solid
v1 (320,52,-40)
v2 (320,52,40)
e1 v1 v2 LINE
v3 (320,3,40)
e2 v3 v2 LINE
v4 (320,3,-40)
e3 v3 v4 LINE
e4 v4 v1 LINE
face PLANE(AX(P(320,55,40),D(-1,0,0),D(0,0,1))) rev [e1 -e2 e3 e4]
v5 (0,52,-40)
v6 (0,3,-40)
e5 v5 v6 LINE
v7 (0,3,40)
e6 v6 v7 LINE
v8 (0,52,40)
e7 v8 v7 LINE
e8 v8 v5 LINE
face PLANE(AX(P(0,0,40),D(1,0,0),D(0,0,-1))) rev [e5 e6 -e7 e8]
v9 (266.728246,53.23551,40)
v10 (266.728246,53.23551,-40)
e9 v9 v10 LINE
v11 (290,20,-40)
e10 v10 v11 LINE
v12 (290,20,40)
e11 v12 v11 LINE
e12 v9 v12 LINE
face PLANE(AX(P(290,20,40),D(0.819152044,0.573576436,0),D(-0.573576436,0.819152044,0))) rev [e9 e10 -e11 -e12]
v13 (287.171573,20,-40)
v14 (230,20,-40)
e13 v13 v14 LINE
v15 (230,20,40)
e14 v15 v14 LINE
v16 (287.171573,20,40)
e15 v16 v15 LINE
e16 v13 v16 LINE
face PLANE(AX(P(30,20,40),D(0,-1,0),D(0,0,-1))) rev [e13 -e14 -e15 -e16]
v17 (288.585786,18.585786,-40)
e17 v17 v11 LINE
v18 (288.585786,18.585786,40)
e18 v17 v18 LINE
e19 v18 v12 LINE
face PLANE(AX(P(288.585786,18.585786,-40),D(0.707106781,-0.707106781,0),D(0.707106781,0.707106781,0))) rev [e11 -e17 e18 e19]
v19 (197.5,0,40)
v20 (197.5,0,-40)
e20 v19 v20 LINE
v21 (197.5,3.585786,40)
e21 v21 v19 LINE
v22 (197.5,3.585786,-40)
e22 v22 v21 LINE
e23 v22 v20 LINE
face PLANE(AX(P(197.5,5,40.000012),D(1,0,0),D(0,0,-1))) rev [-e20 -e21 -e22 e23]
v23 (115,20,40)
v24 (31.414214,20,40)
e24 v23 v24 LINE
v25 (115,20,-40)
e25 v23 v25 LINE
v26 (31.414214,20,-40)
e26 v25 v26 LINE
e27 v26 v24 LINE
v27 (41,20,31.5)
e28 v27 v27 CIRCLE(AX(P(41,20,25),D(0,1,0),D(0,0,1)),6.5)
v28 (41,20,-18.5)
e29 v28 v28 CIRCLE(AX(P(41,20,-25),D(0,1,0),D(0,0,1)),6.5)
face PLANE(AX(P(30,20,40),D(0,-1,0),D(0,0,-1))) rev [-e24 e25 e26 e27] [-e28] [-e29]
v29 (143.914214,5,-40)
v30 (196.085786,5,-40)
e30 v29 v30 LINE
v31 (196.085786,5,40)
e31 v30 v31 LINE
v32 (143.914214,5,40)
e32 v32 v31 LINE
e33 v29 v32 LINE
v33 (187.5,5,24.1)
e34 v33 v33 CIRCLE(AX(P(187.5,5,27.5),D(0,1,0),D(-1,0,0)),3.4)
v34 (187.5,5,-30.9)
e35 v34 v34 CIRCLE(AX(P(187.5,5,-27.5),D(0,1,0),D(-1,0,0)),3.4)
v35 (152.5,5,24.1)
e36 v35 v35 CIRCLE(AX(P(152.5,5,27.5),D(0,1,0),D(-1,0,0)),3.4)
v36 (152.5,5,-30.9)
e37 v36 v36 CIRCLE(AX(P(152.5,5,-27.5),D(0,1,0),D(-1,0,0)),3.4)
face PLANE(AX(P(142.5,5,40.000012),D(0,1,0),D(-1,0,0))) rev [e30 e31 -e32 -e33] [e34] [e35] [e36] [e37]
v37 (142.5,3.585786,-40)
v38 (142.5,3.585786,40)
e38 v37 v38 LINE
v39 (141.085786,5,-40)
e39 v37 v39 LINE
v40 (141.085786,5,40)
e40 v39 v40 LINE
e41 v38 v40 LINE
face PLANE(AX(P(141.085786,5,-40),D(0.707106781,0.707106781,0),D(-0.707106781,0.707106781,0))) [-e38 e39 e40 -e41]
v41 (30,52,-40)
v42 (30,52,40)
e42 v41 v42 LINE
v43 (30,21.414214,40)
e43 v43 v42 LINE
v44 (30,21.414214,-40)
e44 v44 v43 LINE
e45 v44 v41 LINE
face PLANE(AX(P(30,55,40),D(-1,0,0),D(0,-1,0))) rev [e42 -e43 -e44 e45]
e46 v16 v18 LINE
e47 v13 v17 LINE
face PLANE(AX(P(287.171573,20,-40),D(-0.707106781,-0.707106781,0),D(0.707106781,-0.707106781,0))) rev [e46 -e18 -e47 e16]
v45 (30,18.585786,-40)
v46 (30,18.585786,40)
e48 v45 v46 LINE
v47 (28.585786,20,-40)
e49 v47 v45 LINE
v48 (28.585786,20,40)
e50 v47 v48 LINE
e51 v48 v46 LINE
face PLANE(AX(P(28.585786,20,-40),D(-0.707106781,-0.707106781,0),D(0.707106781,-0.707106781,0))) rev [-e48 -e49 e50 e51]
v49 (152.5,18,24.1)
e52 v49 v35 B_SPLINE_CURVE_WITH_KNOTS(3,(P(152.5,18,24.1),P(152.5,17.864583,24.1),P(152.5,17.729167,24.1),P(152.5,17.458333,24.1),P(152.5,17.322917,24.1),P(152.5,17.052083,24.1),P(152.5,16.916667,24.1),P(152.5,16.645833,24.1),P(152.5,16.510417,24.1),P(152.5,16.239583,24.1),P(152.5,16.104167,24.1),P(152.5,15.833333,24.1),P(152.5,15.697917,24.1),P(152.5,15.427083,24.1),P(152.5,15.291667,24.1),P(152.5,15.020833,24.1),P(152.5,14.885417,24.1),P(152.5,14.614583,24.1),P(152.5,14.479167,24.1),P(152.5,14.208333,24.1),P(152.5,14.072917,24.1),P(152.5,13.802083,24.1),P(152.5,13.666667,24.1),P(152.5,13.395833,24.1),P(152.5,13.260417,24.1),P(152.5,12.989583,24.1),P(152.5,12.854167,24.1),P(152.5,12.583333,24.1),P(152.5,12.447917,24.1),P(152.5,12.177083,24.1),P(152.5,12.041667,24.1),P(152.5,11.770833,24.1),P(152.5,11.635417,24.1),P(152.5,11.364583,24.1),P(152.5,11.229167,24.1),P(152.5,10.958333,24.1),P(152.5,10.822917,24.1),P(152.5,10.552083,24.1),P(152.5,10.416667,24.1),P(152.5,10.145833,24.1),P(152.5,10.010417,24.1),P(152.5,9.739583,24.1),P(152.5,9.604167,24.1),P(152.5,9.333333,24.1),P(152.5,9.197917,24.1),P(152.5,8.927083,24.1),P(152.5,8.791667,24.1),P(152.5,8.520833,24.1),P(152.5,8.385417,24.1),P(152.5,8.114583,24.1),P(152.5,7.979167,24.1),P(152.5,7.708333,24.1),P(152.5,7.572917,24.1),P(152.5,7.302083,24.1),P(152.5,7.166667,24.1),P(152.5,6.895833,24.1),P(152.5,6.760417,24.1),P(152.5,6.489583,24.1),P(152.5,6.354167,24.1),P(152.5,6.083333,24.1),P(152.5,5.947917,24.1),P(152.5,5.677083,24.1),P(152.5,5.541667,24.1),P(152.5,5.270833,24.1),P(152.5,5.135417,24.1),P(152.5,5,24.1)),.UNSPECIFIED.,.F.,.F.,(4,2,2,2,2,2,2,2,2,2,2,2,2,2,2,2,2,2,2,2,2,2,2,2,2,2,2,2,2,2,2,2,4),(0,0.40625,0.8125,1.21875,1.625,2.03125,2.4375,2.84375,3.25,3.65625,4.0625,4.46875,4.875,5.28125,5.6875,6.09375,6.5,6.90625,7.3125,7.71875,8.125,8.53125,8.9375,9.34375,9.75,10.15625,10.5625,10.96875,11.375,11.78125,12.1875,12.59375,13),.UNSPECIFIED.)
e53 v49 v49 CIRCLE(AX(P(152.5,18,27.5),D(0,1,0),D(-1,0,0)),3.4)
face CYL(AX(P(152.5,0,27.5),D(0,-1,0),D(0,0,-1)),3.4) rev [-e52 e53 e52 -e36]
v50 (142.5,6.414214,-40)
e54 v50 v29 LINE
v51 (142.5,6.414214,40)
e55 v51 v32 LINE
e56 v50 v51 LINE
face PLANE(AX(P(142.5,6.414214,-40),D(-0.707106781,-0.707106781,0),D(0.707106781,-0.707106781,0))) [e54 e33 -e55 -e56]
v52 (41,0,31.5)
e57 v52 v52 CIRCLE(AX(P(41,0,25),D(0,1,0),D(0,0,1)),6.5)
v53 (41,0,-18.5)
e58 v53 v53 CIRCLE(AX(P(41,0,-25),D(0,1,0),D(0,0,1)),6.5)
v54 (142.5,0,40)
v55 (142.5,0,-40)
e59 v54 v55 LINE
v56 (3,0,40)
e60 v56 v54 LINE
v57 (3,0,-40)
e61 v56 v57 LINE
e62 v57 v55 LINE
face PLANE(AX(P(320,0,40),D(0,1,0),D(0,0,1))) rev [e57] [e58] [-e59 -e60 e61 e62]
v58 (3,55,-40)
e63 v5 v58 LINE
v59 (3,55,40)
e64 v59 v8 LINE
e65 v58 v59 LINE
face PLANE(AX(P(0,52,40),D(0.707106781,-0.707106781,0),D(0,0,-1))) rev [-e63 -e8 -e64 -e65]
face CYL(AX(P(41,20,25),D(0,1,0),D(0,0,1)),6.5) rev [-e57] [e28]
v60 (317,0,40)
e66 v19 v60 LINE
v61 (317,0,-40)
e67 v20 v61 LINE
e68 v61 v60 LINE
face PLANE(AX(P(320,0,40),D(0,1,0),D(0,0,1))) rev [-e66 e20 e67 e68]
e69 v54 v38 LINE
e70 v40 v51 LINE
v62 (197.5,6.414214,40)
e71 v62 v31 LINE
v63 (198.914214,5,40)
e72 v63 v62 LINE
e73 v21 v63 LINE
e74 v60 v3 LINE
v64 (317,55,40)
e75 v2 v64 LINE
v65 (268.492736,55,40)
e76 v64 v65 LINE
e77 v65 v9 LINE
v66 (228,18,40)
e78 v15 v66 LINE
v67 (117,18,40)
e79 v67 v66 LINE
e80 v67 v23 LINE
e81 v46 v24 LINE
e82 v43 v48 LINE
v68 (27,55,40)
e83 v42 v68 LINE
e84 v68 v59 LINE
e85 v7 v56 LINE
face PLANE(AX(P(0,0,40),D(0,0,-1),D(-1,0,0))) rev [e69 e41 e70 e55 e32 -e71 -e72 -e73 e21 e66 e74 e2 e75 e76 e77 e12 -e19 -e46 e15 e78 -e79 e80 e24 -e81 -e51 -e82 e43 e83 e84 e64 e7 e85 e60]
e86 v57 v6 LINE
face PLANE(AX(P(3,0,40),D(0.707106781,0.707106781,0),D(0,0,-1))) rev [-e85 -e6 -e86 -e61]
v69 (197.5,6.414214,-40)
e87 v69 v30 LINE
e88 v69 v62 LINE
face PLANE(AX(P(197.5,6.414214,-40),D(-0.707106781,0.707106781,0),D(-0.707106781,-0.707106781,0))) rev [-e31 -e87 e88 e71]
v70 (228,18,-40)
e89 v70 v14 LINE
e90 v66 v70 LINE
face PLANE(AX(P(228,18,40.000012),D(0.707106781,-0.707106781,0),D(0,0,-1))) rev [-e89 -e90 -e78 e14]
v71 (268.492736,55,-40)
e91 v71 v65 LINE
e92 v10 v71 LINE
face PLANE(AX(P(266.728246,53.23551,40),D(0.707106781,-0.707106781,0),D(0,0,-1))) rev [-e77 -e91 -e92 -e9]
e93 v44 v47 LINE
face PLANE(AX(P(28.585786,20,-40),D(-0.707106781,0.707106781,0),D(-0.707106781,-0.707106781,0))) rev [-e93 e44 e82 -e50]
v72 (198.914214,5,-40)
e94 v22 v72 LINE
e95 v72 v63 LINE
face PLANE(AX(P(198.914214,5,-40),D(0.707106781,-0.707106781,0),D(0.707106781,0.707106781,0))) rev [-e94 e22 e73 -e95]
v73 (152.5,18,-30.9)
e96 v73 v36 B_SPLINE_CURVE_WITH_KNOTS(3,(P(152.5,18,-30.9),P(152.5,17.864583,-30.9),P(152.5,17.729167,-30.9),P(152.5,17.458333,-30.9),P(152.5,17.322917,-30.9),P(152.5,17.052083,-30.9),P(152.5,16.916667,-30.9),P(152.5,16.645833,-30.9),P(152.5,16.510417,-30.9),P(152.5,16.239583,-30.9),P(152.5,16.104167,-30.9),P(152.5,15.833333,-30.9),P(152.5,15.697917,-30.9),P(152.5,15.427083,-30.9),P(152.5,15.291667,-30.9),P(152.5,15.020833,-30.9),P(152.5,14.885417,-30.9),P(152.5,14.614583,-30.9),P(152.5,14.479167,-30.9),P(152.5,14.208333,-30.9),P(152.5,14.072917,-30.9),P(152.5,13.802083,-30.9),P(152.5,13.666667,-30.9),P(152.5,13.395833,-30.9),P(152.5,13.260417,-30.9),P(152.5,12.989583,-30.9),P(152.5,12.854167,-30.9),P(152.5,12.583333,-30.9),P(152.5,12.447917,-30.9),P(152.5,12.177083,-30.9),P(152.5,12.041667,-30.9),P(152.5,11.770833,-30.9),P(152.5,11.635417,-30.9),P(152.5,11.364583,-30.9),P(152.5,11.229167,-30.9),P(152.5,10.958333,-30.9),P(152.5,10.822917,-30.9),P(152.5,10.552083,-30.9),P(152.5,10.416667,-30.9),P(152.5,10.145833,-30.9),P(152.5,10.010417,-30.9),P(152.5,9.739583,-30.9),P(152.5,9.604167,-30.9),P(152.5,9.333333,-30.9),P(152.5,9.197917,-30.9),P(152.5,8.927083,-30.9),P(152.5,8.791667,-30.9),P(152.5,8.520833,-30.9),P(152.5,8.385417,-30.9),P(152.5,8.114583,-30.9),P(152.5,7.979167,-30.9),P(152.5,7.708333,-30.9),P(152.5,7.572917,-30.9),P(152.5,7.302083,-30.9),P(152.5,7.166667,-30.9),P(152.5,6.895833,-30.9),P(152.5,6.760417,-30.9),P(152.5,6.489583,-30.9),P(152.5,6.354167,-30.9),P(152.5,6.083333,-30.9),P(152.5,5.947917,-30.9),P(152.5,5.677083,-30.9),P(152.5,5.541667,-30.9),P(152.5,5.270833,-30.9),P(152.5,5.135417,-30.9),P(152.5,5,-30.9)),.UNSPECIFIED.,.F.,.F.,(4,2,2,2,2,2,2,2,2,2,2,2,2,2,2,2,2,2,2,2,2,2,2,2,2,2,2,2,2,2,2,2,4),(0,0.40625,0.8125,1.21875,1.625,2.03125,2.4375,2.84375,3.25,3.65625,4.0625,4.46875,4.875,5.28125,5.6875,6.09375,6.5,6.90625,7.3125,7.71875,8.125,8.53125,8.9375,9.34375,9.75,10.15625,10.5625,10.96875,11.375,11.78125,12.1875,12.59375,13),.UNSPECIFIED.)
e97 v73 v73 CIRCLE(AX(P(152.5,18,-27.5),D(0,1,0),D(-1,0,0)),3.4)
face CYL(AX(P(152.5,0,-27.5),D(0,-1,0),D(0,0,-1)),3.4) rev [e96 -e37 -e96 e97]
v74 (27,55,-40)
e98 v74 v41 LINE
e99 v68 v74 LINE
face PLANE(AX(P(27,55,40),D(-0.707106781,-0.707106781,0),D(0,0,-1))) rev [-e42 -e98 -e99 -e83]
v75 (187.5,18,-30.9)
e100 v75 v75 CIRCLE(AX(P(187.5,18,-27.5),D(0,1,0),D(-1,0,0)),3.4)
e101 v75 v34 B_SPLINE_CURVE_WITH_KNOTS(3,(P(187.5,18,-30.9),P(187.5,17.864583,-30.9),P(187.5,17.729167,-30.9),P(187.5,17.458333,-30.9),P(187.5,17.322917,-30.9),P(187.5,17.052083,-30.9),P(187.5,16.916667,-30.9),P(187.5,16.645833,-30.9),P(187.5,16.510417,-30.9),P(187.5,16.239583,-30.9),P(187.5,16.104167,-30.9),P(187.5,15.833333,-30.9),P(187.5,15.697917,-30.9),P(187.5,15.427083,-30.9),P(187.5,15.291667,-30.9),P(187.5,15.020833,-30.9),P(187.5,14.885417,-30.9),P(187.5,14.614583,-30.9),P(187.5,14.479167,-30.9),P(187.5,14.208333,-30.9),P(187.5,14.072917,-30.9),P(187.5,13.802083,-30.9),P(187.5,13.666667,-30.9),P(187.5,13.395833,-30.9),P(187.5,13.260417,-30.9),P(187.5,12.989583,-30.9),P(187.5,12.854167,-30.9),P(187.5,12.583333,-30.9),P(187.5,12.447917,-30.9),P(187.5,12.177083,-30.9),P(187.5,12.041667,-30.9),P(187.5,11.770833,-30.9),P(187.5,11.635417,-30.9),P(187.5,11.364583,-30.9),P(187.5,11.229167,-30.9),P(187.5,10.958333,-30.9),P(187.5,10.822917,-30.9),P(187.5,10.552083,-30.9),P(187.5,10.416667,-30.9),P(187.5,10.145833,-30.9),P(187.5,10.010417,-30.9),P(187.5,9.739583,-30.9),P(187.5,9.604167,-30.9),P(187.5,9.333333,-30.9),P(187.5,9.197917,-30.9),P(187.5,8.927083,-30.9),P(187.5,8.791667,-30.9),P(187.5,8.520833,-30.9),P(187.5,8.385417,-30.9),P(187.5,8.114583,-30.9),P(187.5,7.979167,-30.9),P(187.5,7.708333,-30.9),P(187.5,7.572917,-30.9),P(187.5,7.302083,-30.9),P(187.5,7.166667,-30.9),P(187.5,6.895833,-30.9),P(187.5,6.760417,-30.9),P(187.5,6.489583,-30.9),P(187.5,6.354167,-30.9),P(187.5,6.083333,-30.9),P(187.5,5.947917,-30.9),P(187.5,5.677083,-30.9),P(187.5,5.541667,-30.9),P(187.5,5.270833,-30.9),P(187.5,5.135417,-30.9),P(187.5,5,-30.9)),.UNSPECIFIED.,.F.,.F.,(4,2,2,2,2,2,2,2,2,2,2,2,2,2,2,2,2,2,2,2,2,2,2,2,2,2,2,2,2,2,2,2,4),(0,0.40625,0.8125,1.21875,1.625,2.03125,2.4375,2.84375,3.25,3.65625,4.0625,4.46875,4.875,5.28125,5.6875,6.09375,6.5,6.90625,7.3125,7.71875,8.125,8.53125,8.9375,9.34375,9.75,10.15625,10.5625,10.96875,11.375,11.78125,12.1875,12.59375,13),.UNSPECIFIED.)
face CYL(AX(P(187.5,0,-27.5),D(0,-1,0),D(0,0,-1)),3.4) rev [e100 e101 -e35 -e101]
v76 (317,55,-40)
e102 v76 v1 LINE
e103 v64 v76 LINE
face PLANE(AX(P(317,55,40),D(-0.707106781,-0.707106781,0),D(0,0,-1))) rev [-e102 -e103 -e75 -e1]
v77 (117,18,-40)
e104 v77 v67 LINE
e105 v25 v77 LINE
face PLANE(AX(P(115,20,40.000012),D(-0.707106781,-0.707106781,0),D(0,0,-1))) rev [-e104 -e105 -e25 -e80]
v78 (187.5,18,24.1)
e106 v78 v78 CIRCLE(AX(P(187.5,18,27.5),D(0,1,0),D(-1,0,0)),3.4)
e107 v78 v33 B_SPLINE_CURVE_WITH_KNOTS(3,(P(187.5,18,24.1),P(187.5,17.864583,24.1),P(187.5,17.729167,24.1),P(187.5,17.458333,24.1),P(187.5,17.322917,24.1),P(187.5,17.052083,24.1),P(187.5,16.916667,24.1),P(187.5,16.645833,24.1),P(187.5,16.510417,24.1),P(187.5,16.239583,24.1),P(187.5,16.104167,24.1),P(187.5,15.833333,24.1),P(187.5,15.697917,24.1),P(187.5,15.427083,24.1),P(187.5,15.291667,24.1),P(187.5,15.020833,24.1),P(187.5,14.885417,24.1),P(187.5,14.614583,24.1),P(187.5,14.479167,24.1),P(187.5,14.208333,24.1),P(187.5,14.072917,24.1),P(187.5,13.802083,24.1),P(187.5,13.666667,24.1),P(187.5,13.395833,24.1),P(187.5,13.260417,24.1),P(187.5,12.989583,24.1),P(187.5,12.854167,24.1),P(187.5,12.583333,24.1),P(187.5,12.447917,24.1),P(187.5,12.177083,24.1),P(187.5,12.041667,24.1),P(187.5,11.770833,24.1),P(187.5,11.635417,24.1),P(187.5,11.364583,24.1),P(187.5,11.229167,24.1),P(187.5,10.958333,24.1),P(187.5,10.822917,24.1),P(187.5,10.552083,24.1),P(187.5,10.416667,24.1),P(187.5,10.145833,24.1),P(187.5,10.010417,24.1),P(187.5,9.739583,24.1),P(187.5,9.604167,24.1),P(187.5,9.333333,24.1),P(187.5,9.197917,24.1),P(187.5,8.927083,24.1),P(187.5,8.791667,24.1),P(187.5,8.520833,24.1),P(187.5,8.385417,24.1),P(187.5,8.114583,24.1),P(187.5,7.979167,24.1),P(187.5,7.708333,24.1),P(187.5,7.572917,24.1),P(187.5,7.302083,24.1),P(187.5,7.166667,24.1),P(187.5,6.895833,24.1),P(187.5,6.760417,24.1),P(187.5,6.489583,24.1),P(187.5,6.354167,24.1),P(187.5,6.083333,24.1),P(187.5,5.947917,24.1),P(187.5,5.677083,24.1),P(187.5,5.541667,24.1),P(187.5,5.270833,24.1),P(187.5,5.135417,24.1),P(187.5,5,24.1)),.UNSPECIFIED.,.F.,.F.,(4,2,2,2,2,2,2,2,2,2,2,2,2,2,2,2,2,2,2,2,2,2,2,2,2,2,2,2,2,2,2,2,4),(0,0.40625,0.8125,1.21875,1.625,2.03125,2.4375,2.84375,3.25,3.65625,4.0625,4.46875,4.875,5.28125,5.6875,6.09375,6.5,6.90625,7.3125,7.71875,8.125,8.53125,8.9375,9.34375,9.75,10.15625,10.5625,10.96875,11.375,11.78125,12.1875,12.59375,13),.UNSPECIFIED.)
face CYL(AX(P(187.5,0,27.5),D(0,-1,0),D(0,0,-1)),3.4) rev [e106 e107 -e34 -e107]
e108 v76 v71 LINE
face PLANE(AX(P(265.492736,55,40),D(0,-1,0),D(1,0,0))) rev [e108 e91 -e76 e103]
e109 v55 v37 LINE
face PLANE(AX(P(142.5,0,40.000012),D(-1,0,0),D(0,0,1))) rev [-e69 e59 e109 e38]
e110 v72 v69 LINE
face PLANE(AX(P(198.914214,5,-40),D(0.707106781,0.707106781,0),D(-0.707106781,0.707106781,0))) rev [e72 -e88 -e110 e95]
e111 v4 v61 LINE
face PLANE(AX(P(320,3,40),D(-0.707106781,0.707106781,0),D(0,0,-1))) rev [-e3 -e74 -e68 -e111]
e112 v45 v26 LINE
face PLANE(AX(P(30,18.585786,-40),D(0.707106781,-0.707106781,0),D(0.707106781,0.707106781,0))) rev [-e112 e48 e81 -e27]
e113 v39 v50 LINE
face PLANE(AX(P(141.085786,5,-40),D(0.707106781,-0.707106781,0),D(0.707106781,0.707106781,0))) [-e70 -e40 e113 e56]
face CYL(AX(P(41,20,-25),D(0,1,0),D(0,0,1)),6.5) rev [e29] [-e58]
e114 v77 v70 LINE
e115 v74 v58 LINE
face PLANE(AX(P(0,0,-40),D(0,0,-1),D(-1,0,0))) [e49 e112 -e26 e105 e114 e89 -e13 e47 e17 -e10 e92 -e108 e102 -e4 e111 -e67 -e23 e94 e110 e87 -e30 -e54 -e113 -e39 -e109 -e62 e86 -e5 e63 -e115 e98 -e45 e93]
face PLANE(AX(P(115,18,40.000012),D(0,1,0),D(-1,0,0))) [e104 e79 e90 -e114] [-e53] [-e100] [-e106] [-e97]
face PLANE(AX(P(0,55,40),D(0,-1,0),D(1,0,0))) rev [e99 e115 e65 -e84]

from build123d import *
from OCP.BRepFilletAPI import BRepFilletAPI_MakeChamfer

# Parameters (mm, degrees)
EXTRUDE_1_DEPTH          = 40
CUT_EXTRUDE_1_DEPTH      = 335.402452144
CUT_EXTRUDE_1_DEPTH_BACK = 80
SKETCH_2_W               = 115
SKETCH_2_H               = 2
CHAMFER_1_SIZE           = 2
CUT_EXTRUDE_1_2_DEPTH    = 80
CUT_EXTRUDE_2_DEPTH      = 335.402452144
CUT_EXTRUDE_2_DEPTH_BACK = 80
SKETCH_4_W               = 55
SKETCH_4_H               = 5
CUT_EXTRUDE_2_2_DEPTH    = 80
HOLE_WIZARD_M8_1_D       = 6.8
HOLE_WIZARD_1_D          = 13
CHAMFER_2_SIZE           = 3
CHAMFER_2_SIZE2          = 2.154045129


with BuildPart() as part:
    # 草图1 → 凸台-拉伸1 (new, symmetric)
    with BuildSketch(Plane.XY):
        Polygon((0, 0), (0, 55), (30, 55), (30, 20), (290, 20), (265.492736163, 55), (320, 55), (320, 0), align=None)
    extrude(amount=EXTRUDE_1_DEPTH, both=True)

    # 草图2 → Cut-Extrude 1 (cut, two sides: drawn at the far end of the back side and taken through both)
    with BuildSketch(Plane.XY.offset(40).offset(-CUT_EXTRUDE_1_DEPTH_BACK)):
        with Locations((172.5, 19)):
            Rectangle(SKETCH_2_W, SKETCH_2_H)
    extrude(amount=CUT_EXTRUDE_1_DEPTH + CUT_EXTRUDE_1_DEPTH_BACK, mode=Mode.SUBTRACT)

    # 倒角1
    chamfer_1_edges = [part.edges().sort_by_distance(p)[0] for p in [
        (230, 18, 0),
        (115, 18, 0),
    ]]
    chamfer(chamfer_1_edges, length=CHAMFER_1_SIZE - 0.0001)  # a hair under: the kernel refuses the full size

    # 草图3 → Cut-Extrude 1 2 (cut)
    with BuildSketch(Plane.XY.offset(40)):
        Polygon((287.171572875, 20), (288.585786438, 18.585786438), (290, 20), (288.585786438, 21.414213562), align=None)
        Polygon((28.585786438, 20), (30, 21.414213562), (31.414213562, 20), (30, 18.585786438), align=None)
    extrude(amount=-CUT_EXTRUDE_1_2_DEPTH, mode=Mode.SUBTRACT)

    # 草图4 → Cut-Extrude 2 (cut, two sides: drawn at the far end of the back side and taken through both)
    with BuildSketch(Plane.XY.offset(40).offset(-CUT_EXTRUDE_2_DEPTH_BACK)):
        with Locations((170, 2.5)):
            Rectangle(SKETCH_4_W, SKETCH_4_H)
    extrude(amount=CUT_EXTRUDE_2_DEPTH + CUT_EXTRUDE_2_DEPTH_BACK, mode=Mode.SUBTRACT)

    # 草图5 → Cut-Extrude 2 2 (cut)
    with BuildSketch(Plane.XY.offset(40)):
        Polygon((198.914213562, 5), (197.5, 6.414213562), (196.085786438, 5), (197.5, 3.585786438), align=None)
    cut_extrude_2_2 = extrude(amount=-CUT_EXTRUDE_2_2_DEPTH, mode=Mode.SUBTRACT)

    # 镜向1: Cut-Extrude 2 2 across plane
    add(cut_extrude_2_2.mirror(Plane(origin=(170, 0, 0), x_dir=(0, 0, 1), z_dir=(1, 0, 0))), mode=Mode.SUBTRACT)

    # M8 螺纹孔1 (through all)
    with Locations(Plane.XZ):
        with Locations((152.5, 27.5), (187.5, 27.5), (187.5, -27.5), (152.5, -27.5)):
            Hole(HOLE_WIZARD_M8_1_D / 2)

    # 孔1 (through all)
    with Locations(Plane(origin=(0, 20, 0), x_dir=(1, 0, 0), z_dir=(0, 1, 0))):
        with Locations((41, 25), (41, -25)):
            Hole(HOLE_WIZARD_1_D / 2)

    # 倒角2: one chamfer whose edges measure the first distance from different faces: ONE call of the kernel's chamfer builder (chamfer() names one face for all edges)
    chamfer_2_edges_1 = [part.edges().sort_by_distance(p)[0] for p in [
        (0, 0, 0),
        (0, 55, 0),
        (30, 55, 0),
        (320, 55, 0),
        (320, 0, 0),
    ]]
    chamfer_2_edges_2 = [part.edges().sort_by_distance(p)[0] for p in [
        (265.492736163, 55, 0),
    ]]
    chamfer_2_side_2 = [part.faces().sort_by_distance(p)[0] for p in [
        (292.746368081, 55, 0),
    ]]
    chamfer_2 = BRepFilletAPI_MakeChamfer(part.part.solid().wrapped)
    for e in chamfer_2_edges_1:
        chamfer_2.Add(CHAMFER_2_SIZE, e.wrapped)
    for e in chamfer_2_edges_2:
        chamfer_2.Add(CHAMFER_2_SIZE, CHAMFER_2_SIZE2, e.wrapped, chamfer_2_side_2[0].wrapped)  # the first distance lies on this face
    add(Compound.cast(chamfer_2.Shape()), mode=Mode.REPLACE)


solid = part.part
